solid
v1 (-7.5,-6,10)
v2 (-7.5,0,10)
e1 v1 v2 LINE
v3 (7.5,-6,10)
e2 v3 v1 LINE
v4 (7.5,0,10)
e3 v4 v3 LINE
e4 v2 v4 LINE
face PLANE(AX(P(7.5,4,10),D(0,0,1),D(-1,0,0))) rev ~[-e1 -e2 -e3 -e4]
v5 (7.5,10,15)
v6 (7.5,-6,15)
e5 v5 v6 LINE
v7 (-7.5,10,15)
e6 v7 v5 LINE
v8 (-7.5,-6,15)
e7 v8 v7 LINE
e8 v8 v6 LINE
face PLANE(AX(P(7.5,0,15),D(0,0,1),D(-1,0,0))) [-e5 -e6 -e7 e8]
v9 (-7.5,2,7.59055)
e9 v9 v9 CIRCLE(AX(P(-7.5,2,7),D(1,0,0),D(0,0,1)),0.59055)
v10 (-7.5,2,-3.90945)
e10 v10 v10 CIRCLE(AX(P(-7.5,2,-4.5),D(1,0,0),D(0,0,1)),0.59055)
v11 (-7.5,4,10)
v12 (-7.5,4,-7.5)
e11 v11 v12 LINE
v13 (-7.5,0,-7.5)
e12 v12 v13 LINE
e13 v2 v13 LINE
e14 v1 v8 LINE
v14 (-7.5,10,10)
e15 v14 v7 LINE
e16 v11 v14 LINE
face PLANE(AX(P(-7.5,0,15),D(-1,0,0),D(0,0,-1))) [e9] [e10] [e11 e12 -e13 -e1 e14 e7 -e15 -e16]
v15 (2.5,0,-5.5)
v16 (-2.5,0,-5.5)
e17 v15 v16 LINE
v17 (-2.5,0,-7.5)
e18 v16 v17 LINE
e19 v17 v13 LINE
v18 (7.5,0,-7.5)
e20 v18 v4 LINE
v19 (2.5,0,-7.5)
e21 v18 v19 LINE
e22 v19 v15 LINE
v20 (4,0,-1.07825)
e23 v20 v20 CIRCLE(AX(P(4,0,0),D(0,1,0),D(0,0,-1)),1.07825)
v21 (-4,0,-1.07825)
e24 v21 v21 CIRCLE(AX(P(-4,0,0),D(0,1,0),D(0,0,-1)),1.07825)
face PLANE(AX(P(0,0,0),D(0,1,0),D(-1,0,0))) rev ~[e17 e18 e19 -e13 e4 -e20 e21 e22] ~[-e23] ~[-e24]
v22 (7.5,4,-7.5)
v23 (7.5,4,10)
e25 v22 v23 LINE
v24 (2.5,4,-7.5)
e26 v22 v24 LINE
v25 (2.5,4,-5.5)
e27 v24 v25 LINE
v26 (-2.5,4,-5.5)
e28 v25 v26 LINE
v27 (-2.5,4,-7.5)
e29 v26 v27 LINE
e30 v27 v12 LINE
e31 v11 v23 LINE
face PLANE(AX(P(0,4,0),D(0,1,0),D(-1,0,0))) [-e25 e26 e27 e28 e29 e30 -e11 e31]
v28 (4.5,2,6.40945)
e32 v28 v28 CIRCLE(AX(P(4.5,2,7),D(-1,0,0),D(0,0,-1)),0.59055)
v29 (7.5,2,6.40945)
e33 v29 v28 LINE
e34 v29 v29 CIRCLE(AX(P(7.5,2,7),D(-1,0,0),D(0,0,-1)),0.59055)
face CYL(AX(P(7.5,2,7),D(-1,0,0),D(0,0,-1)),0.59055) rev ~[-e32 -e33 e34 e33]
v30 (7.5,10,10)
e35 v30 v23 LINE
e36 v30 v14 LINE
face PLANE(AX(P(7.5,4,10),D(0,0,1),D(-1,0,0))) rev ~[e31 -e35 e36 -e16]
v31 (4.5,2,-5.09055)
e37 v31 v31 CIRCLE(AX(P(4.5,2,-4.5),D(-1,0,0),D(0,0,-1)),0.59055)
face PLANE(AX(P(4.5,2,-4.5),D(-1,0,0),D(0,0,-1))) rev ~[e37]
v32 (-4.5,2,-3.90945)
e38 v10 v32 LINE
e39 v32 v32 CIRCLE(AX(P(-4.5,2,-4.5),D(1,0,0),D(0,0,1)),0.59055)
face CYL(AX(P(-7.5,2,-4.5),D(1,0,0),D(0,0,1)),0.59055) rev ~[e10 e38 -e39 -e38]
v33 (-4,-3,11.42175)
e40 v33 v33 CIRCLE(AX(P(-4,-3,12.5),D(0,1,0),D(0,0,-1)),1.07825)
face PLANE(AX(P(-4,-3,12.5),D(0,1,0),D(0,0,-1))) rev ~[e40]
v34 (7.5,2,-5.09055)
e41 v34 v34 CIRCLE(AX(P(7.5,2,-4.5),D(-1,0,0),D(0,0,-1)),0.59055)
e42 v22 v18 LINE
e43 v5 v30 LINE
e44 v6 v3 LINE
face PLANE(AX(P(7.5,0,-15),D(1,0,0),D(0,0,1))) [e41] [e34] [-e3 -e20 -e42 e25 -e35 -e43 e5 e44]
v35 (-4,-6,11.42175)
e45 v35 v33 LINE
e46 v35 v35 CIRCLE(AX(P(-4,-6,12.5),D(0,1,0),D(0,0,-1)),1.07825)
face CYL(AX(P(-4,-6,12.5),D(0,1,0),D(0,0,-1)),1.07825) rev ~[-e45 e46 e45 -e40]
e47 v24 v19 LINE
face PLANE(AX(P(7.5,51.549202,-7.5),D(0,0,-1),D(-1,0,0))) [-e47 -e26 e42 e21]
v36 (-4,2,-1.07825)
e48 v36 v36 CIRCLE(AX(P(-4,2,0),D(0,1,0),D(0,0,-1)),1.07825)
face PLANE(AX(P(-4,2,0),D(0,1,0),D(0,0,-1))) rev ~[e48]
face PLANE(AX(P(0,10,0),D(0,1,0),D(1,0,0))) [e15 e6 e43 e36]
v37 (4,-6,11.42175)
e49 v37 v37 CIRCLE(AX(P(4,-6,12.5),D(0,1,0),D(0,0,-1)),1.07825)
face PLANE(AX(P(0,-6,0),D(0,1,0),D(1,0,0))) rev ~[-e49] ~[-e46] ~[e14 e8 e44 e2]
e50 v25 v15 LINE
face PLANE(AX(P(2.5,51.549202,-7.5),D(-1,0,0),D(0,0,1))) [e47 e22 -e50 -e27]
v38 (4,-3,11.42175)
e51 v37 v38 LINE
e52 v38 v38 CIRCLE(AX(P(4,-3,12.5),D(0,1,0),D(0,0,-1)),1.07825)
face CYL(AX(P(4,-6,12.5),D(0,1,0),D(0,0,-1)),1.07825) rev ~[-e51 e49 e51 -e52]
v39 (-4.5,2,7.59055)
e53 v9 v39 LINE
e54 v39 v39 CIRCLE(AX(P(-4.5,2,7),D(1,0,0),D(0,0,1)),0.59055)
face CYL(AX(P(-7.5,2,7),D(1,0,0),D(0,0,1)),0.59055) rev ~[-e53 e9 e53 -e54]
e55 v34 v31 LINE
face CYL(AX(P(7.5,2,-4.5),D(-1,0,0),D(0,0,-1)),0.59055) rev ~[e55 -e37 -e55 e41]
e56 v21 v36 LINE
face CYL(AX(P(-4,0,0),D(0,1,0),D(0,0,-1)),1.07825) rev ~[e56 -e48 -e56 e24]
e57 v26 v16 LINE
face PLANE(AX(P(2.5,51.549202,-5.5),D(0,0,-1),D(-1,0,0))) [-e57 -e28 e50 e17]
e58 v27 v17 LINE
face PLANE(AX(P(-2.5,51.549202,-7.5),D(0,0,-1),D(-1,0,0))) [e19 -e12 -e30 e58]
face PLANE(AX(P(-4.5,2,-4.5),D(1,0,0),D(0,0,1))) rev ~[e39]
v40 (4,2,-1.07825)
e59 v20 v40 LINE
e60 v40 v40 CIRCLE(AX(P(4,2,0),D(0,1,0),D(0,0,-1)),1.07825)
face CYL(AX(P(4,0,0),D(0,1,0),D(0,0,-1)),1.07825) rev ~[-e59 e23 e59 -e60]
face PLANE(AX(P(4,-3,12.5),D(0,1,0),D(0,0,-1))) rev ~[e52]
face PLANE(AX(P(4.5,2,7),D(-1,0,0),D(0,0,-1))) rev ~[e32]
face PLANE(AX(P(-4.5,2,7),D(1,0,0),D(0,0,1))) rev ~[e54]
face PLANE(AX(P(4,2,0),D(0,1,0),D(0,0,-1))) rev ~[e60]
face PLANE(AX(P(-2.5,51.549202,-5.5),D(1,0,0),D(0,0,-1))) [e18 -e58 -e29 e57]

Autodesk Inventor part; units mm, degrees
ref_plane "YZ Plane" through (0, 0, 0) normal (1, 0, 0) x (0, 1, 0)
ref_plane "XZ Plane" through (0, 0, 0) normal (0, 1, 0) x (-1, 0, 0)
ref_plane "XY Plane" through (0, 0, 0) normal (0, 0, 1) x (1, 0, 0)
sketch "Sketch1" plane through (0, 0, 0) normal (0, 1, 0) x (-1, 0, 0)
  line L0 (-7.5, 15) -> (7.5, 15)
  line L1 (7.5, 15) -> (7.5, -15)
  line L2 (7.5, -15) -> (-7.5, -15)
  line L3 (-7.5, -15) -> (-7.5, 15)
  line L4 (-7.5, 15) -> (7.5, -15) construction
  line L5 (7.5, 15) -> (-7.5, -15) construction
  point P0 (0, 0)
  dimension "d0" = 15
  dimension "d1" = 30
extrude "Extrusion1" add sketch "Sketch1" along normal blind 4
chamfer "Chamfer1" distance 2.5 distance2 1 1 edges at (7.5, 2, -15) measured on face at (7.5, 1.3333, 5)
chamfer "Chamfer2" distance 1 distance2 2.5 1 edges at (-7.5, 2, -15) measured on face at (1.8333, 2.6667, -15)
sketch "Sketch3" plane through (0, 0, 0) normal (0, -1, 0) x (1, 0, 0)
  line L0 (0, 0) -> (4, 0)
  line L1 (0, 0) -> (-4, 0)
  dimension "d14" = 4
  dimension "d15" = 4
hole "Hole1" at (4, 0, 0) at (-4, 0, 0) direction (0, 1, 0) diameter 2.1565 depth 2 thread size "4-40 UNC" class "2B" standard "ANSI Unified Screw Threads"
sketch "Sketch4" plane through (0, 0, 0) normal (0, -1, 0) x (1, 0, 0)
  line L0 (7.5, 15) -> (7.5, -12.5) projected
  line L1 (7.5, -12.5) -> (7.5, -7.5)
  line L2 (7.5, -7.5) -> (2.5, -7.5)
  line L3 (2.5, -7.5) -> (2.5, -5.5)
  line L4 (2.5, -5.5) -> (-2.5, -5.5)
  line L5 (-2.5, -5.5) -> (-2.5, -7.5)
  line L6 (-2.5, -7.5) -> (-7.5679, -7.5)
  line L7 (-7.5679, -7.5) -> (-7.5679, -12.5)
  line L8 (6.5, -15) -> (-6.5, -15) projected
  line L9 (-7.5679, -12.5) -> (-6.5, -15)
  line L10 (7.5, -12.5) -> (6.5, -15) projected
  line L11 (-6.5, -15) -> (6.5, -15)
  line L12 (6.5, -15) -> (7.5, -12.5)
  point P0 (0, 0)
  dimension "d23" = 5
  dimension "d24" = 5
  dimension "d25" = 2
  dimension "d26" = 5
split body "Split1" sketch "Sketch4" result one side removed curves L2 L3 L4 L5 L6 L7 L9 L11 L12 L1 removed pieces at (0.8333, 0.5, -12.5)
sketch "Sketch5" plane through (0, 4, 0) normal (0, 1, 0) x (1, 0, 0)
  line L0 (-7.5, 7.5) -> (-7.5, -15) projected
  line L1 (7.5, -15) -> (7.5, 7.5) projected
  line L2 (-7.5, -15) -> (7.5, -15)
  line L3 (7.5, -15) -> (7.5, -10)
  line L4 (7.5, -10) -> (-7.5, -10)
  line L5 (-7.5, -10) -> (-7.5, -15)
  point P0 (0, 0)
  dimension "d27" = 5
extrude "Extrusion3" add sketch "Sketch5" along normal blind 6 and the other way blind 10
sketch "Sketch6" plane through (7.5, 0, -7.5) normal (1, 0, 0) x (0, 0, -1)
  line L0 (0, 4) -> (0, 0) projected
  line L1 (0, 2) -> (-3, 2)
  line L2 (-17.5, 2) -> (-14.5, 2)
  point P0 (-7.5, 0)
  dimension "d38" = 3
  dimension "d39" = 3
hole "Hole2" at (7.5, 2, 7) at (7.5, 2, -4.5) direction (-1, 0, 0) diameter 1.1811 depth 3 thread size "0-80 UNF" class "2B" standard "ANSI Unified Screw Threads"
sketch "Sketch7" plane through (-7.5, 0, -7.5) normal (-1, 0, 0) x (0, 0, 1)
  circle A0 centre (3, 2) radius 0.5906 projected
  circle A1 centre (14.5, 2) radius 0.5906 projected
  point P0 (7.5, 0)
hole "Hole3" at (-7.5, 2, 7) at (-7.5, 2, -4.5) direction (1, 0, 0) diameter 1.1811 depth 3 thread size "0-80 UNF" class "2B" standard "ANSI Unified Screw Threads"
sketch "Sketch8" plane through (0, -6, 0) normal (0, -1, 0) x (1, 0, 0)
  line L0 (7.5, 10) -> (7.5, 15) projected
  line L1 (7.5, 12.5) -> (4, 12.5)
  line L2 (-7.5, 10) -> (-7.5, 15) projected
  line L3 (-7.5, 12.5) -> (-4, 12.5)
  point P0 (0, 0)
  dimension "d54" = 3.5
  dimension "d55" = 3.5
hole "Hole4" at (4, -6, 12.5) at (-4, -6, 12.5) direction (0, 1, 0) diameter 2.1565 depth 3 thread size "4-40 UNC" class "2B" standard "ANSI Unified Screw Threads"
properties part number "copper_thermal_contact" material "Copper"
